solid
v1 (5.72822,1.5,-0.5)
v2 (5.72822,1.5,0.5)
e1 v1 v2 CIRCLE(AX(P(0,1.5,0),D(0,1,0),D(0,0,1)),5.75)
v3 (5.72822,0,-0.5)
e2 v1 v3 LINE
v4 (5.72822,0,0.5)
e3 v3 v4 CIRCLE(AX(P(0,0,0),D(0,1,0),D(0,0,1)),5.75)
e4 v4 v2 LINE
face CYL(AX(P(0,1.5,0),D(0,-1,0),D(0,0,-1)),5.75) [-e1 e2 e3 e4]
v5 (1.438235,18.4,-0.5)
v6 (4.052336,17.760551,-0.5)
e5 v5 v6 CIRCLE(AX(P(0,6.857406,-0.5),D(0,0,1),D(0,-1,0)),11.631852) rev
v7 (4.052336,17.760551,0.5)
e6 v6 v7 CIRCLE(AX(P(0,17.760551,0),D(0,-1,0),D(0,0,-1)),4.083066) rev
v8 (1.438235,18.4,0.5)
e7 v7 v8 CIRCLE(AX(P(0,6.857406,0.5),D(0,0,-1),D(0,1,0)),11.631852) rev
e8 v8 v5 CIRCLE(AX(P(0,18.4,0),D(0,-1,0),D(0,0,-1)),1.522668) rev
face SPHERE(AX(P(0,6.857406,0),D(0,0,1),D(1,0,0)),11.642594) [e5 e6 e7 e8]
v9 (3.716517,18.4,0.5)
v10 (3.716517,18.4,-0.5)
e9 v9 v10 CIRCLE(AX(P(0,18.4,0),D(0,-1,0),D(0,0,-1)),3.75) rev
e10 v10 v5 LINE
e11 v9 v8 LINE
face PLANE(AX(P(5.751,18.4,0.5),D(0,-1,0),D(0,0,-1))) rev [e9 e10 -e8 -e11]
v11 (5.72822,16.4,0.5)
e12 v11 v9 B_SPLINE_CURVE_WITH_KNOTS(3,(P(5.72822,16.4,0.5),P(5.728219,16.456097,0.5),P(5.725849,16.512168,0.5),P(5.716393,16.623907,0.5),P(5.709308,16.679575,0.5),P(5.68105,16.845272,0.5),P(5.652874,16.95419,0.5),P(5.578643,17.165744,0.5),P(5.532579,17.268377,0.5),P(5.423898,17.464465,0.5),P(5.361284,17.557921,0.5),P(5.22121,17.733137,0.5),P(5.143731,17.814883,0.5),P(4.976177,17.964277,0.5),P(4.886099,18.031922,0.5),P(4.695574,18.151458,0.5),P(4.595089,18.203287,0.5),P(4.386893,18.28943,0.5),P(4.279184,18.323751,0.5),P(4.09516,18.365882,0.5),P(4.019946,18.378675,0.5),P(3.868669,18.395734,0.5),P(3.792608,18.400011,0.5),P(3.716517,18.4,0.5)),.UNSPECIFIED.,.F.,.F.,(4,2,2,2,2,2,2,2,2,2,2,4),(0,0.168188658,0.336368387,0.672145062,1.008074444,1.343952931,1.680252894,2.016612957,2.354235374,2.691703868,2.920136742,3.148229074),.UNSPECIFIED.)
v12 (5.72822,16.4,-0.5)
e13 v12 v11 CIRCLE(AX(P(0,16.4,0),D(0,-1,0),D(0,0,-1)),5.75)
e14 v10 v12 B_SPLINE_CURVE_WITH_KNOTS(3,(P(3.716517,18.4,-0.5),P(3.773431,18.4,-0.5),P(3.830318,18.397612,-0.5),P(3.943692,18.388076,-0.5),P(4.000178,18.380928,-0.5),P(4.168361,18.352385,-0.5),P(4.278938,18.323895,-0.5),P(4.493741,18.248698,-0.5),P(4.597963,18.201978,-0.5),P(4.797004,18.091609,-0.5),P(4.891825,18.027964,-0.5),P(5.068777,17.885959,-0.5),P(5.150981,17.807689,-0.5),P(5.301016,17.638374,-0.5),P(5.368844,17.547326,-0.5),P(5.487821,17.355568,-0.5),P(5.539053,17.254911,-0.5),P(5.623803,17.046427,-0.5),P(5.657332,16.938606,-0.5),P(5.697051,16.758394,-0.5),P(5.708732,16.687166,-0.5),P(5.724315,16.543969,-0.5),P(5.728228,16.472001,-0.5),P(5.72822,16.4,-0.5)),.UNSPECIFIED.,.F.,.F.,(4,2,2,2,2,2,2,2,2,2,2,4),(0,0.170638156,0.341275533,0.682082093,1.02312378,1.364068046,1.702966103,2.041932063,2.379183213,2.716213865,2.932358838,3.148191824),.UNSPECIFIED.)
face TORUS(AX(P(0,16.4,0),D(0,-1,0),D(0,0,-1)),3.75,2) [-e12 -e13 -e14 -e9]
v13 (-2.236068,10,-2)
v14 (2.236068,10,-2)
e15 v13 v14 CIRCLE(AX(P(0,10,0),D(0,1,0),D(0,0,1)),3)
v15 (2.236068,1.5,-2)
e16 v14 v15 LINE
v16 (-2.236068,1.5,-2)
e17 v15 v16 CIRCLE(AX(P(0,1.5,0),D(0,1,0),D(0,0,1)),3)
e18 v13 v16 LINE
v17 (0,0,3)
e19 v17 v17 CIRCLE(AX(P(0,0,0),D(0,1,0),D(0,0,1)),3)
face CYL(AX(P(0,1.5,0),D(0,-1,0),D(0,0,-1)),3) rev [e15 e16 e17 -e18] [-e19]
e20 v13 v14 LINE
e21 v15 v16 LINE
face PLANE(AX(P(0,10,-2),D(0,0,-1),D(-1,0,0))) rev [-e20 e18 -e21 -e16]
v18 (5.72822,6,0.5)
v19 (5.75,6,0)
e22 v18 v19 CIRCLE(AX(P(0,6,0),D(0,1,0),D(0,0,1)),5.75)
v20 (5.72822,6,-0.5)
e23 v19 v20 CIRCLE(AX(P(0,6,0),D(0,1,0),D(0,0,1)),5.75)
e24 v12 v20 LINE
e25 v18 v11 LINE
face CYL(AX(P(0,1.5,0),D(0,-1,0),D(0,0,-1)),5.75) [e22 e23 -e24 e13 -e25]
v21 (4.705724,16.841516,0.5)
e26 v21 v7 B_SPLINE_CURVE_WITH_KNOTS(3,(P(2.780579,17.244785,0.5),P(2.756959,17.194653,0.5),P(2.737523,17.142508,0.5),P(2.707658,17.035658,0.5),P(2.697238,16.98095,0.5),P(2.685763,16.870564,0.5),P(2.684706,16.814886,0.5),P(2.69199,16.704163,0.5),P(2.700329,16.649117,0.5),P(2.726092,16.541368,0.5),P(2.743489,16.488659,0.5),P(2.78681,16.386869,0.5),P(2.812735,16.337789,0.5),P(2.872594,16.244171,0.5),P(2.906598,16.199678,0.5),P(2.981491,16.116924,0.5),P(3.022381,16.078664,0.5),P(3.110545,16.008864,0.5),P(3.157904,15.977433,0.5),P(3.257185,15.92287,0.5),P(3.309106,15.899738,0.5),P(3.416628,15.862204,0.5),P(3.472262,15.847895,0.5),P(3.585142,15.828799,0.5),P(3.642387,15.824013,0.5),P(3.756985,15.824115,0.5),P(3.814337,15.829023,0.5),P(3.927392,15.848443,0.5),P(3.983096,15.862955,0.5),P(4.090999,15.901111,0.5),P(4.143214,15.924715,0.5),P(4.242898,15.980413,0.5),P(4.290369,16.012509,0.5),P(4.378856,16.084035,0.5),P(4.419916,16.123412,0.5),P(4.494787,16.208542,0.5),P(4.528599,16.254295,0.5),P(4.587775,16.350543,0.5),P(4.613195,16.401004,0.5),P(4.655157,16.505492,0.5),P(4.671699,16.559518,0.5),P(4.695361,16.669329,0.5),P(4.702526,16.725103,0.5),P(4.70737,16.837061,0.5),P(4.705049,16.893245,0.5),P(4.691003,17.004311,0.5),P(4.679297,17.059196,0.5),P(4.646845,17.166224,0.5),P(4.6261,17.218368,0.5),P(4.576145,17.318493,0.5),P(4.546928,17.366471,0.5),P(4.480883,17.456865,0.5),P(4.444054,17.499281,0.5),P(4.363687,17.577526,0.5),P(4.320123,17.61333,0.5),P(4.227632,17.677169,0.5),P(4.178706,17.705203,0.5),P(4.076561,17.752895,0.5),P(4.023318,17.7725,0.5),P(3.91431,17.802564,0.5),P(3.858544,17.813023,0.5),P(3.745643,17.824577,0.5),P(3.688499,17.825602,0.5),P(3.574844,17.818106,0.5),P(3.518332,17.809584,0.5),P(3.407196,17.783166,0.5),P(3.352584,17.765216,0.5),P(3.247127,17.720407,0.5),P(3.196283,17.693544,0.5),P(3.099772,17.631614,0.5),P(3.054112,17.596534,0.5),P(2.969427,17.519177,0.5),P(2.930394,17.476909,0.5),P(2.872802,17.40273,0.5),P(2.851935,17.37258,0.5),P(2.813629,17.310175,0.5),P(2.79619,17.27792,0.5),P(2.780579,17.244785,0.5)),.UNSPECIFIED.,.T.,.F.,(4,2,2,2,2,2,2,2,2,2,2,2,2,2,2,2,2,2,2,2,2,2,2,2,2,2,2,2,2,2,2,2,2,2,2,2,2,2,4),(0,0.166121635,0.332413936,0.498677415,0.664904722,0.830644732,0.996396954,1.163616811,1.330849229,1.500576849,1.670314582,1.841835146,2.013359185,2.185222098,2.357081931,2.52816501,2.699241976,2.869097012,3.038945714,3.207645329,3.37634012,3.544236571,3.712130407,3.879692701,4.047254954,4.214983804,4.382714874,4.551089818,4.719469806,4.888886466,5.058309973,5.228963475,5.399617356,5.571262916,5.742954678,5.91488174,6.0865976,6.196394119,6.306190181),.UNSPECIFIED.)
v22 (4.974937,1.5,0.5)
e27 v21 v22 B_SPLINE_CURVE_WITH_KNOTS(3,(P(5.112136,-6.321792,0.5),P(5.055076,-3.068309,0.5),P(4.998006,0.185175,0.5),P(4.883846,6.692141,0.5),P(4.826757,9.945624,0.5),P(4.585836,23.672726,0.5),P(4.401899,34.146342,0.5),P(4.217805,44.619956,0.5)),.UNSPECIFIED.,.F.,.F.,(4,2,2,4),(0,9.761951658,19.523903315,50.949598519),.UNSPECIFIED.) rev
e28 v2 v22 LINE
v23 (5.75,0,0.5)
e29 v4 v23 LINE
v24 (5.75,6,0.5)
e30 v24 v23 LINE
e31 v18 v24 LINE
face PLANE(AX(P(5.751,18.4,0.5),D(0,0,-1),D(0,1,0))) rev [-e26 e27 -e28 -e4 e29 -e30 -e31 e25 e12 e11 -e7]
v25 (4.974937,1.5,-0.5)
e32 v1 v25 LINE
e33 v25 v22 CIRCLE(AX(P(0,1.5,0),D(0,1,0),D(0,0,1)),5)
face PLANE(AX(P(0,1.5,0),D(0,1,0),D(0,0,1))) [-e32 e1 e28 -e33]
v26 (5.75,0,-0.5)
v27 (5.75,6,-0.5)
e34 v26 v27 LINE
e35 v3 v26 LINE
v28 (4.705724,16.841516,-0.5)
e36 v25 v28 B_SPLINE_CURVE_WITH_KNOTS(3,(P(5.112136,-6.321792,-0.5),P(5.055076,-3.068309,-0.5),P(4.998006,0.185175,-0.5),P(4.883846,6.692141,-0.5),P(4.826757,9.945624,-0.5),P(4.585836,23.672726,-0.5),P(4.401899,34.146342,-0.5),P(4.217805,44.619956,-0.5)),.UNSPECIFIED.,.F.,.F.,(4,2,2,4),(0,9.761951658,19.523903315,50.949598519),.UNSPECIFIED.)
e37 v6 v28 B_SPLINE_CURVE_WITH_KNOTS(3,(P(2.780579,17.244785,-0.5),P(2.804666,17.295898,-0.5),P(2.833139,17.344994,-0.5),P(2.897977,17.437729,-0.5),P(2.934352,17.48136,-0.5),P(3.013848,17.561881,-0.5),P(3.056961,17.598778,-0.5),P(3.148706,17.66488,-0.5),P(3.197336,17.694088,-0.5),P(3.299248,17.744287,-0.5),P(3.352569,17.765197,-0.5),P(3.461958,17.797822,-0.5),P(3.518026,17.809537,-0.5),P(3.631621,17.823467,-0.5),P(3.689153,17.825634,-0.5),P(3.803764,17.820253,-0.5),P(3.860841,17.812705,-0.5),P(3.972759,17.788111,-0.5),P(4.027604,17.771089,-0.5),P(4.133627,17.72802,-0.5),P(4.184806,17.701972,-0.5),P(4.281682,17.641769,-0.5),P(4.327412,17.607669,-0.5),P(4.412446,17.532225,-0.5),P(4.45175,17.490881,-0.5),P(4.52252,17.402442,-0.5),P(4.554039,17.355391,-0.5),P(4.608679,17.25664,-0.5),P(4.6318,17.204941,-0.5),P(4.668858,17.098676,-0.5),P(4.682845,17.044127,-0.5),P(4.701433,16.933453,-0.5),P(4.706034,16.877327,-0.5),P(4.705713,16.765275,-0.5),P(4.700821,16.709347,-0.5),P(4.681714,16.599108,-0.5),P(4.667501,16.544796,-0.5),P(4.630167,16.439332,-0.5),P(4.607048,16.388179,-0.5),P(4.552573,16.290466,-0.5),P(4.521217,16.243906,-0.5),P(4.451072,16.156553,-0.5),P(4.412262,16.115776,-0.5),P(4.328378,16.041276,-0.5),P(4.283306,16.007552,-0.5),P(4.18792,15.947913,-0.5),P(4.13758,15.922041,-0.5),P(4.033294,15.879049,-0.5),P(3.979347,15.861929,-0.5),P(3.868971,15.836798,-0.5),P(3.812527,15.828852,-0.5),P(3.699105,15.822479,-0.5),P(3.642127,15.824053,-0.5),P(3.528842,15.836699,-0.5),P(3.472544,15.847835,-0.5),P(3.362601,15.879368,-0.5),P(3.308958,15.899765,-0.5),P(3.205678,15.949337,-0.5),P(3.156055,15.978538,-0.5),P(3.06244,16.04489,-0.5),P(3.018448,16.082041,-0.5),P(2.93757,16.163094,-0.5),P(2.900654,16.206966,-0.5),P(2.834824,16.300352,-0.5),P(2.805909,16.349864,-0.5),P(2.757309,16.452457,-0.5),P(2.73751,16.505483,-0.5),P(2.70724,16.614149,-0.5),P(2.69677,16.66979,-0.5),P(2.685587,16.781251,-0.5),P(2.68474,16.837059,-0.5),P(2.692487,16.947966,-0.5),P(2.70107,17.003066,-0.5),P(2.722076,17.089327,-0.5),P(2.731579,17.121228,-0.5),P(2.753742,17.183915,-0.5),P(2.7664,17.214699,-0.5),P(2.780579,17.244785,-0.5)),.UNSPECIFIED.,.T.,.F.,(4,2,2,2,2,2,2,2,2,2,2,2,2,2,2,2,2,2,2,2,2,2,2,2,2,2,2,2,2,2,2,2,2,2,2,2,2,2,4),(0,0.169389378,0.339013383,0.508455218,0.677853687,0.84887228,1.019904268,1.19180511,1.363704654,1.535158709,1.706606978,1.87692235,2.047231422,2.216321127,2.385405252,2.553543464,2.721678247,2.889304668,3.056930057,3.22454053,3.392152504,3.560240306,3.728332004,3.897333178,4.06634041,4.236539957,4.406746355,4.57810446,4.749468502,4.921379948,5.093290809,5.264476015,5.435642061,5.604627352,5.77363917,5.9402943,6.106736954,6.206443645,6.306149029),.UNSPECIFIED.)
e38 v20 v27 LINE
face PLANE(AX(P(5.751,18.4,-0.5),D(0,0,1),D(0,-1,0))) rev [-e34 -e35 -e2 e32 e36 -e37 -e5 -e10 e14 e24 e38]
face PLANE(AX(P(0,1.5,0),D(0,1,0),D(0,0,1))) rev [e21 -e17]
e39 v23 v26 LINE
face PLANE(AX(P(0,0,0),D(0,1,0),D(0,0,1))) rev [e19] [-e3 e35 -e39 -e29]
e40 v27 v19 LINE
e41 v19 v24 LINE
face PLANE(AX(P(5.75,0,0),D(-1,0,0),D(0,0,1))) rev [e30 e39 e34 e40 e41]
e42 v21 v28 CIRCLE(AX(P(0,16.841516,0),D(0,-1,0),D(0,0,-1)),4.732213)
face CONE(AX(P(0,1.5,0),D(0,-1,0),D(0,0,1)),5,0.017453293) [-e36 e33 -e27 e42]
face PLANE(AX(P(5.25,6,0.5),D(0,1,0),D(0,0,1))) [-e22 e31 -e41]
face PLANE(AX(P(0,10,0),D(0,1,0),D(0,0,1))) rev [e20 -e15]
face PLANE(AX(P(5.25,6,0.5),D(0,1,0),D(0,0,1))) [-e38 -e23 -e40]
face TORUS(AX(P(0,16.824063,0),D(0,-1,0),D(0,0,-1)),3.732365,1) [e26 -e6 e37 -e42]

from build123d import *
from build123d.topology import SkipClean

# Parameters (mm, degrees)
SKETCH1_R                = 5.75
SKETCH1_R_2              = 3
BOSS_EXTRUDE1_DEPTH      = 1.5
SKETCH2_R                = 5
BOSS_EXTRUDE2_DEPTH      = 16
BOSS_EXTRUDE2_TAPER      = 1
FILLET1_R                = 1
BOSS_EXTRUDE3_REACH      = 22.208
BOSS_EXTRUDE3_END_RADIUS = 5.75
SKETCH4_W                = 1
SKETCH4_H                = 16.9
FILLET2_R                = 2
CUT_EXTRUDE1_DEPTH       = 10
BOSS_EXTRUDE4_START      = 5.75
SKETCH6_W                = 1
SKETCH6_H                = 6
BOSS_EXTRUDE4_DEPTH      = 0.5


# Read off the part's stored shape, not the designer's step: Dome1
with BuildPart() as part:
    # Sketch1 → Boss-Extrude1 (new body)
    with BuildSketch(Plane(origin=(0, 0, 0), x_dir=(1, 0, 0), z_dir=(0, 1, 0))):
        with Locations(Location((0, 0, 0), (0, 0, 270))):
            Circle(SKETCH1_R)
        with Locations(Location((0, 0, 0), (0, 0, 270))):
            Circle(SKETCH1_R_2, mode=Mode.SUBTRACT)
    extrude(amount=BOSS_EXTRUDE1_DEPTH)

    # Sketch2 → Boss-Extrude2 (add)
    with BuildSketch(Plane(origin=(0, 1.5, 0), x_dir=(1, 0, 0), z_dir=(0, 1, 0))):
        Circle(SKETCH2_R)
    extrude(amount=BOSS_EXTRUDE2_DEPTH, taper=BOSS_EXTRUDE2_TAPER)

    # Dome1 outline → Dome1 (revolve)
    with BuildSketch(Plane.XY):
        with BuildLine():
            Line((0, 17.5), (4.720718972, 17.499999995))
            ThreePointArc((4.720718972, 17.499999995), (2.412736394, 18.247256658), (0, 18.5))
            Line((0, 18.5), (0, 17.5))
        make_face()
    revolve(axis=Axis((0, 0, 0), (0, 1, 0)))

    # Fillet1
    fillet1_edges = [part.edges().sort_by_distance(p)[0] for p in [
        (-4.720718961, 17.5, 0),
    ]]
    fillet(fillet1_edges, radius=FILLET1_R)

    # Boss-Extrude3: up to this cylinder (the profile starts inside it)
    with SkipClean():  # the faces are left unmerged after this step: merging them gives an invalid solid
        boss_extrude3_end = Plane(origin=(0, 9.95, 0), z_dir=(0, -1, 0)) * Cylinder(BOSS_EXTRUDE3_END_RADIUS, 56.916, mode=Mode.PRIVATE)
        # Sketch4 → Boss-Extrude3 (add, up to the surface)
        with BuildSketch(Plane(origin=(0, 0, 0), x_dir=(0, 0, -1), z_dir=(1, 0, 0)), mode=Mode.PRIVATE) as boss_extrude3_sk1:
            with Locations((0, 9.95)):
                Rectangle(SKETCH4_W, SKETCH4_H)
        boss_extrude3_tool1 = extrude(boss_extrude3_sk1.sketch, amount=BOSS_EXTRUDE3_REACH, mode=Mode.PRIVATE) & boss_extrude3_end
        add(boss_extrude3_tool1.solids().sort_by_distance((0, 9.95, 0))[0])

    # Fillet2
    fillet2_edges = [part.edges().sort_by_distance(p)[0] for p in [
        (5.75, 18.4, 0),
    ]]
    fillet(fillet2_edges, radius=FILLET2_R)

    # Sketch5 → Cut-Extrude1 (cut)
    with BuildSketch(Plane(origin=(0, 0, 0), x_dir=(1, 0, 0), z_dir=(0, 1, 0))):
        with BuildLine():
            Line((-2.236067977, 2), (2.236067977, 2))
            ThreePointArc((2.236067977, 2), (0, -3), (-2.236067977, 2))
        make_face()
    extrude(amount=CUT_EXTRUDE1_DEPTH, mode=Mode.SUBTRACT)

    # Sketch6 → Boss-Extrude4 (add)
    with BuildSketch(Plane(origin=(0, 0, 0), x_dir=(0, 0, -1), z_dir=(1, 0, 0)).offset(BOSS_EXTRUDE4_START)):
        with Locations((0, 3)):
            Rectangle(SKETCH6_W, SKETCH6_H)
    extrude(amount=-BOSS_EXTRUDE4_DEPTH)


solid = part.part
